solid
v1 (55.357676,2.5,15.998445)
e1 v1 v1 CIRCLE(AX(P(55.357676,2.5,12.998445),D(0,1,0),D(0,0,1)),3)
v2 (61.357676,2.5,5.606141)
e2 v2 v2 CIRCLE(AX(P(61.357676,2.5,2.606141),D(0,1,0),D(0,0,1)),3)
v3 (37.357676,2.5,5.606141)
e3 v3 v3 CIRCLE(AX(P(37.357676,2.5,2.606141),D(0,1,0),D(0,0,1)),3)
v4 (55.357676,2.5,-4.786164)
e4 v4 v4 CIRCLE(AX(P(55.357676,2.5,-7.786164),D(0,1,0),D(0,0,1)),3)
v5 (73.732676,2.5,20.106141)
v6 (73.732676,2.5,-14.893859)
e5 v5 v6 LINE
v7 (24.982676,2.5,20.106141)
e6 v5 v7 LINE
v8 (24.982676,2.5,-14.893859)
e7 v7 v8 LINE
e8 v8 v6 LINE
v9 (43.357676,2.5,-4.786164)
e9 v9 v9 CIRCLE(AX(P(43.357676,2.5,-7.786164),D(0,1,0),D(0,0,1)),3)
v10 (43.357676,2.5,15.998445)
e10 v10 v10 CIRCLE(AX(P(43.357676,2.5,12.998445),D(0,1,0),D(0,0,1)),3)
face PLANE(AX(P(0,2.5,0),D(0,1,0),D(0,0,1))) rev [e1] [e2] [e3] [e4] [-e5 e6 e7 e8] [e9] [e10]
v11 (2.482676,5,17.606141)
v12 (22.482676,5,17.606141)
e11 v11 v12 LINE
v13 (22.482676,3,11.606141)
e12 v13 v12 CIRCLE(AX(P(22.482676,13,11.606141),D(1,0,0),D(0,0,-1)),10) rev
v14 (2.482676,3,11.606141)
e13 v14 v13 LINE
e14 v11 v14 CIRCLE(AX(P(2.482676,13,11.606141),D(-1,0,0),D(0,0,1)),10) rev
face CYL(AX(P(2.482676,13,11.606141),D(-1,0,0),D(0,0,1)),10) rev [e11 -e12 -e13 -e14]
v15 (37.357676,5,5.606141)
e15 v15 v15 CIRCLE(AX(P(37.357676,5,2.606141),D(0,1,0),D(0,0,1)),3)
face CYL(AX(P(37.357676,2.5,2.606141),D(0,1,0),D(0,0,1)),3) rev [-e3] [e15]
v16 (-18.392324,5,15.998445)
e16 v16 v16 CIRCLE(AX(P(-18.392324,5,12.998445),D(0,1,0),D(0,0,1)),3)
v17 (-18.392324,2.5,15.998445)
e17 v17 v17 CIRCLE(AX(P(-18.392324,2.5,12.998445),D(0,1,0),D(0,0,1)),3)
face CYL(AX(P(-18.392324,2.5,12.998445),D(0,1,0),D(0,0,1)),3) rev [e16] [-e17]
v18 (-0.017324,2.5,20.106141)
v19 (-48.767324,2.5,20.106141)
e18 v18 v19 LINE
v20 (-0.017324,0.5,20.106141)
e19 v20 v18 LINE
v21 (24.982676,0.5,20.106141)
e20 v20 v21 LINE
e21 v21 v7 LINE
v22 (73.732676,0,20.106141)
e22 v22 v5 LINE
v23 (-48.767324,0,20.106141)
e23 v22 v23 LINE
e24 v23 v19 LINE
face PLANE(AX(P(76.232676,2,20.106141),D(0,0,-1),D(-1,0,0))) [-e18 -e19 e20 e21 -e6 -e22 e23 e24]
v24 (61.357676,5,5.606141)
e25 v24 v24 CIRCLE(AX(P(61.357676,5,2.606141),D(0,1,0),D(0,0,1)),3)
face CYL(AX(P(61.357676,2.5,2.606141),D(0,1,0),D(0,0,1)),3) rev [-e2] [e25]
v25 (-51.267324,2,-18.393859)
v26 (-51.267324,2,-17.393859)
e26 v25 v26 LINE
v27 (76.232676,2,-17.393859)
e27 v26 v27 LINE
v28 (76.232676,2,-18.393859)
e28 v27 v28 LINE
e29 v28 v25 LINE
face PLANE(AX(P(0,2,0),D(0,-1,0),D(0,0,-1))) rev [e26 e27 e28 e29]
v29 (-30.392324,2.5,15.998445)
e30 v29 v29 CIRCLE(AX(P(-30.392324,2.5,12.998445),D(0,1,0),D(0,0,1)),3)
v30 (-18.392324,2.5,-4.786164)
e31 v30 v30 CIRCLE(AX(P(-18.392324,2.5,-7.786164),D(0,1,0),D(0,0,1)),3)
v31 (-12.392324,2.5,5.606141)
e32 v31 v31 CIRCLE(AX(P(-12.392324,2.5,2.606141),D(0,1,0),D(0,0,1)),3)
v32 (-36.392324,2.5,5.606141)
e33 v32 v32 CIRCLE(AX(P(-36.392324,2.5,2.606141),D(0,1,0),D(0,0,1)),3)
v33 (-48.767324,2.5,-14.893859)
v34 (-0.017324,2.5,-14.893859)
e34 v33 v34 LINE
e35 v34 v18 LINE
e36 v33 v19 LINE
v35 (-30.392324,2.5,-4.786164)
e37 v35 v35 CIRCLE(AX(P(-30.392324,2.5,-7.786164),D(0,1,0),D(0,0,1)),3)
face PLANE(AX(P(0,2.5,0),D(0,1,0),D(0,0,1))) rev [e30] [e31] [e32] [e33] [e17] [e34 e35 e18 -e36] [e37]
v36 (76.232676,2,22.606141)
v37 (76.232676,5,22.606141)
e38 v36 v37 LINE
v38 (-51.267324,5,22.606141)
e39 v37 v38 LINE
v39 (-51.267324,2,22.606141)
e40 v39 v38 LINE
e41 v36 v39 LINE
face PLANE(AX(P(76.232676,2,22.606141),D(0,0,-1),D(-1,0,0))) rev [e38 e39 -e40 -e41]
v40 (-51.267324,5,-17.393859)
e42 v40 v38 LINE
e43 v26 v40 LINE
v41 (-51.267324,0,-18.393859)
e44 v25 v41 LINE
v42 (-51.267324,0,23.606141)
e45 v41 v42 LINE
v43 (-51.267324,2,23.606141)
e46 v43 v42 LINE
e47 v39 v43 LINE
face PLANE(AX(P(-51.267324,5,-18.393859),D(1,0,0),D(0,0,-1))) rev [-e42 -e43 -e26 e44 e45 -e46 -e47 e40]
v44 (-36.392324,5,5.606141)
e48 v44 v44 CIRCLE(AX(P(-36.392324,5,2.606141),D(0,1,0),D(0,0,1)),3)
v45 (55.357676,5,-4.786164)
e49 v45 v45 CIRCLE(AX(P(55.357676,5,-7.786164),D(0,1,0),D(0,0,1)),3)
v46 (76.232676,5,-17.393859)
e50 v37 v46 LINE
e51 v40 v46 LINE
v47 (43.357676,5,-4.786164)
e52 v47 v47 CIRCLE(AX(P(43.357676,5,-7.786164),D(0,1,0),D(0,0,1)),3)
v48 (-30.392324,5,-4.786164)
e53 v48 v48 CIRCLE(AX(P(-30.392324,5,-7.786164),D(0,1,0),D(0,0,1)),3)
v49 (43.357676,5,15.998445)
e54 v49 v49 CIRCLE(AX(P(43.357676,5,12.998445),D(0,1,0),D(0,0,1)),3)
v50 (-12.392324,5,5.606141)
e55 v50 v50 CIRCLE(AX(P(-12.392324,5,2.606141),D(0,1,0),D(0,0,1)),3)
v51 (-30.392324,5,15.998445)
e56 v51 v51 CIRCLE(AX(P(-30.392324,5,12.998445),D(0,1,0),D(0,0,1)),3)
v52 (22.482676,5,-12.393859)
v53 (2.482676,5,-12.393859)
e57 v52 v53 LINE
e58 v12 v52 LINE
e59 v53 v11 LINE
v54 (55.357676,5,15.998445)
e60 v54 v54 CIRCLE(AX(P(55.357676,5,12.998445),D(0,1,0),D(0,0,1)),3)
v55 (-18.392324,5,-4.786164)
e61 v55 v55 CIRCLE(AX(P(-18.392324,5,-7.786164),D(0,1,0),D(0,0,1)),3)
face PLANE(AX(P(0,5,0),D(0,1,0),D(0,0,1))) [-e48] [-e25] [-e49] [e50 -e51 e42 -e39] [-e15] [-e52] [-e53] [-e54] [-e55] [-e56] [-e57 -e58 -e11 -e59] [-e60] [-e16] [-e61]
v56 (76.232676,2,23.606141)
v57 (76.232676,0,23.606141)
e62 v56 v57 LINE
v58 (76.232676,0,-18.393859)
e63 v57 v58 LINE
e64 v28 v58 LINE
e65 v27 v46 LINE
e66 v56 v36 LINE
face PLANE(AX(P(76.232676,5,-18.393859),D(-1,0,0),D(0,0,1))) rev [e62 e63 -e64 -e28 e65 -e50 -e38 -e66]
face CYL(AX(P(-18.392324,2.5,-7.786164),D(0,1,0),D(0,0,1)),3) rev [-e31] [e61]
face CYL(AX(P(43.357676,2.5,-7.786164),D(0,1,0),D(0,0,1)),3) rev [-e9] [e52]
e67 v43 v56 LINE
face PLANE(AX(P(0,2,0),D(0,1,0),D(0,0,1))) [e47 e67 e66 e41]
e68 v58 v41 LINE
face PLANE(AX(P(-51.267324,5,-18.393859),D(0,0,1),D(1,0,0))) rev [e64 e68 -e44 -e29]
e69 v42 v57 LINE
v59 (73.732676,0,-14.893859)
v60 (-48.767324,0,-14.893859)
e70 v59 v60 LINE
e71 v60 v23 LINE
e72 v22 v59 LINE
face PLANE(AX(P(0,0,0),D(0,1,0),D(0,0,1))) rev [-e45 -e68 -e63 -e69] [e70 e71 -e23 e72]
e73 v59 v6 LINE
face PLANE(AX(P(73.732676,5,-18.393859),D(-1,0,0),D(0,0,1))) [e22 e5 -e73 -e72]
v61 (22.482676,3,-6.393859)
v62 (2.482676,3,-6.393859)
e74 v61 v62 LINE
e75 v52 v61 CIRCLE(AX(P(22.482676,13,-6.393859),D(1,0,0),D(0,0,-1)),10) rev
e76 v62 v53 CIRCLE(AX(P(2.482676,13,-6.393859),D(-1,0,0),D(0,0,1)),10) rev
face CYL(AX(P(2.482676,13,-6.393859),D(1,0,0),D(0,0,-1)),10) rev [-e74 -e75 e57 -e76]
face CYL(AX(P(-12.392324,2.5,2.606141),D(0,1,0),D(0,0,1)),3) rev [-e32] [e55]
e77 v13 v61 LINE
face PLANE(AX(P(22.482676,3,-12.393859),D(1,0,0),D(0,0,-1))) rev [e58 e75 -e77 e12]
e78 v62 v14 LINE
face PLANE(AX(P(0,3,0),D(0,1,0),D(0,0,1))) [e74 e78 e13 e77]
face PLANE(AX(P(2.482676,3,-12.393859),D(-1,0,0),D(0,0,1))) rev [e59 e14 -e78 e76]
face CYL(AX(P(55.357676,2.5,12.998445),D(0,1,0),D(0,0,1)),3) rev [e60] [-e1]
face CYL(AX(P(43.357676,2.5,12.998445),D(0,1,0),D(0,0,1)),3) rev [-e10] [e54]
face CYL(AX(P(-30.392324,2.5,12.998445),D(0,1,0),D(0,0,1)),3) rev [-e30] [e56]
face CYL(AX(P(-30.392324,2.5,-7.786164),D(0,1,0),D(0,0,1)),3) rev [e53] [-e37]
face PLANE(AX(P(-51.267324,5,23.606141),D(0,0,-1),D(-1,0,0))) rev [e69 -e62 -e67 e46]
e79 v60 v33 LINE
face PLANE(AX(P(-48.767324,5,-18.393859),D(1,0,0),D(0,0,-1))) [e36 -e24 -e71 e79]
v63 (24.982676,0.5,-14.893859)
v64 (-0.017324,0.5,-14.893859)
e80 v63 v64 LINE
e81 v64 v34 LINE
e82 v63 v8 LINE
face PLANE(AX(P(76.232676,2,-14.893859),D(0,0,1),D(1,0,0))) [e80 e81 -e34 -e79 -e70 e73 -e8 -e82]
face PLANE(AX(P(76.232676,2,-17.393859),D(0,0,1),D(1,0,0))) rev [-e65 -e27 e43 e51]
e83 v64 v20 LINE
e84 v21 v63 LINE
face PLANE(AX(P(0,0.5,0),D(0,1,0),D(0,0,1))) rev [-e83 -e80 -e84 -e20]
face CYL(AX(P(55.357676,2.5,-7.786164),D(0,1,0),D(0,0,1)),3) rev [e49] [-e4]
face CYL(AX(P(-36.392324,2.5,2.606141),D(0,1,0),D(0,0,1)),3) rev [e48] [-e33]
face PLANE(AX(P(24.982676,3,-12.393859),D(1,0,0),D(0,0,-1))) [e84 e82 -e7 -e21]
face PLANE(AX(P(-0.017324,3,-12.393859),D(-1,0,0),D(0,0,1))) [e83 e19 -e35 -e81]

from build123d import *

# Parameters (mm, degrees)
SKETCH1_W           = 127.5
SKETCH1_H           = 42
BOSS_EXTRUDE1_DEPTH = 5
SKETCH2_W           = 127.5
SKETCH2_H           = 1
CUT_EXTRUDE1_DEPTH  = 3
SKETCH7_W           = 20
SKETCH7_H           = 30
CUT_EXTRUDE5_DEPTH  = 2
SHELL8_START        = -14.893859366
SHELL8_DEPTH        = 35
FILLET3_R           = 10
FILLET4_R           = 10
SKETCH10_R          = 3
CUT_EXTRUDE6_DEPTH  = 2.5


# Read off the part's stored shape, not the designer's step: Shell8
with BuildPart() as part:
    # Sketch1 → Boss-Extrude1 (new body)
    with BuildSketch(Plane(origin=(0, 0, 0), x_dir=(1, 0, 0), z_dir=(0, 1, 0))):
        with Locations((12.48267617, -2.606140634)):
            Rectangle(SKETCH1_W, SKETCH1_H)
    extrude(amount=BOSS_EXTRUDE1_DEPTH)

    # Sketch2 → Cut-Extrude1 (cut)
    with BuildSketch(Plane(origin=(0, 5, 0), x_dir=(1, 0, 0), z_dir=(0, 1, 0))):
        with Locations((12.48267617, 17.893859366)):
            Rectangle(SKETCH2_W, SKETCH2_H)
        with Locations((12.48267617, -23.106140634)):
            Rectangle(SKETCH2_W, SKETCH2_H)
    extrude(amount=-CUT_EXTRUDE1_DEPTH, mode=Mode.SUBTRACT)

    # Sketch7 → Cut-Extrude5 (cut)
    with BuildSketch(Plane(origin=(0, 5, 0), x_dir=(1, 0, 0), z_dir=(0, 1, 0))):
        with Locations((12.48267617, -2.606140634)):
            Rectangle(SKETCH7_W, SKETCH7_H)
    extrude(amount=-CUT_EXTRUDE5_DEPTH, mode=Mode.SUBTRACT)

    # Shell8 outline → Shell8 (cut)
    with BuildSketch(Plane.XY.offset(SHELL8_START)):
        Polygon((-0.01732383, 0.5), (-0.01732383, 2.5), (-48.76732383, 2.5), (-48.76732383, 0), (73.73267617, 0), (73.73267617, 2.5), (24.98267617, 2.5), (24.98267617, 0.5), align=None)
    extrude(amount=SHELL8_DEPTH, mode=Mode.SUBTRACT)

    # Fillet3
    # the kernel refuses this fillet: 10 mm, written as the material it adds along each edge
    with BuildSketch(Plane(origin=(37.48267617, 3, 17.606140634), x_dir=(0, 1, 0), z_dir=(-1, 0, 0))) as fillet3_piece_1:
        with BuildLine():
            CenterArc((10, 6), FILLET3_R, 180, 36.869897646)
            Line((0, 6), (-0.2, 6))
            Line((-0.2, 6), (-0.2, 0))
            Line((-0.2, 0), (0, -0.2))
            ThreePointArc((0, -0.2), (1, -0.2), (1.84, -0.12))
            Line((1.84, -0.12), (2, 0))
        make_face()
    extrude(amount=50)

    # Fillet4
    # the kernel refuses this fillet: 10 mm, written as the material it adds along each edge
    with BuildSketch(Plane(origin=(-12.51732383, 3, -12.393859366), x_dir=(0, 0, 1), z_dir=(1, 0, 0))) as fillet4_piece_1:
        with BuildLine():
            CenterArc((6, -10), FILLET4_R, 90, 36.869897646)
            Line((0, -2), (-0.12, -1.84))
            ThreePointArc((-0.12, -1.84), (-0.2, -1), (-0.2, 0))
            Line((-0.2, 0), (0, 0.2))
            Line((0, 0.2), (6, 0.2))
            Line((6, 0.2), (6, 0))
        make_face()
    extrude(amount=50)

    # Sketch10 → Cut-Extrude6 (cut)
    with BuildSketch(Plane(origin=(0, 5, 0), x_dir=(1, 0, 0), z_dir=(0, 1, 0))):
        with Locations(Location((-12.39232383, -2.606140634, 0), (0, 0, 270))):
            Circle(SKETCH10_R)
        with Locations(Location((-18.39232383, -12.998445479, 0), (0, 0, 270))):
            Circle(SKETCH10_R)
        with Locations(Location((-30.39232383, -12.998445479, 0), (0, 0, 270))):
            Circle(SKETCH10_R)
        with Locations(Location((-36.39232383, -2.606140634, 0), (0, 0, 270))):
            Circle(SKETCH10_R)
        with Locations(Location((-30.39232383, 7.786164212, 0), (0, 0, 270))):
            Circle(SKETCH10_R)
        with Locations(Location((-18.39232383, 7.786164212, 0), (0, 0, 270))):
            Circle(SKETCH10_R)
        with Locations(Location((61.35767617, -2.606140634, 0), (0, 0, 270))):
            Circle(SKETCH10_R)
        with Locations(Location((55.35767617, -12.998445479, 0), (0, 0, 270))):
            Circle(SKETCH10_R)
        with Locations(Location((43.35767617, -12.998445479, 0), (0, 0, 270))):
            Circle(SKETCH10_R)
        with Locations(Location((37.35767617, -2.606140634, 0), (0, 0, 270))):
            Circle(SKETCH10_R)
        with Locations(Location((43.35767617, 7.786164212, 0), (0, 0, 270))):
            Circle(SKETCH10_R)
        with Locations(Location((55.35767617, 7.786164212, 0), (0, 0, 270))):
            Circle(SKETCH10_R)
    extrude(amount=-CUT_EXTRUDE6_DEPTH, mode=Mode.SUBTRACT)


solid = part.part
